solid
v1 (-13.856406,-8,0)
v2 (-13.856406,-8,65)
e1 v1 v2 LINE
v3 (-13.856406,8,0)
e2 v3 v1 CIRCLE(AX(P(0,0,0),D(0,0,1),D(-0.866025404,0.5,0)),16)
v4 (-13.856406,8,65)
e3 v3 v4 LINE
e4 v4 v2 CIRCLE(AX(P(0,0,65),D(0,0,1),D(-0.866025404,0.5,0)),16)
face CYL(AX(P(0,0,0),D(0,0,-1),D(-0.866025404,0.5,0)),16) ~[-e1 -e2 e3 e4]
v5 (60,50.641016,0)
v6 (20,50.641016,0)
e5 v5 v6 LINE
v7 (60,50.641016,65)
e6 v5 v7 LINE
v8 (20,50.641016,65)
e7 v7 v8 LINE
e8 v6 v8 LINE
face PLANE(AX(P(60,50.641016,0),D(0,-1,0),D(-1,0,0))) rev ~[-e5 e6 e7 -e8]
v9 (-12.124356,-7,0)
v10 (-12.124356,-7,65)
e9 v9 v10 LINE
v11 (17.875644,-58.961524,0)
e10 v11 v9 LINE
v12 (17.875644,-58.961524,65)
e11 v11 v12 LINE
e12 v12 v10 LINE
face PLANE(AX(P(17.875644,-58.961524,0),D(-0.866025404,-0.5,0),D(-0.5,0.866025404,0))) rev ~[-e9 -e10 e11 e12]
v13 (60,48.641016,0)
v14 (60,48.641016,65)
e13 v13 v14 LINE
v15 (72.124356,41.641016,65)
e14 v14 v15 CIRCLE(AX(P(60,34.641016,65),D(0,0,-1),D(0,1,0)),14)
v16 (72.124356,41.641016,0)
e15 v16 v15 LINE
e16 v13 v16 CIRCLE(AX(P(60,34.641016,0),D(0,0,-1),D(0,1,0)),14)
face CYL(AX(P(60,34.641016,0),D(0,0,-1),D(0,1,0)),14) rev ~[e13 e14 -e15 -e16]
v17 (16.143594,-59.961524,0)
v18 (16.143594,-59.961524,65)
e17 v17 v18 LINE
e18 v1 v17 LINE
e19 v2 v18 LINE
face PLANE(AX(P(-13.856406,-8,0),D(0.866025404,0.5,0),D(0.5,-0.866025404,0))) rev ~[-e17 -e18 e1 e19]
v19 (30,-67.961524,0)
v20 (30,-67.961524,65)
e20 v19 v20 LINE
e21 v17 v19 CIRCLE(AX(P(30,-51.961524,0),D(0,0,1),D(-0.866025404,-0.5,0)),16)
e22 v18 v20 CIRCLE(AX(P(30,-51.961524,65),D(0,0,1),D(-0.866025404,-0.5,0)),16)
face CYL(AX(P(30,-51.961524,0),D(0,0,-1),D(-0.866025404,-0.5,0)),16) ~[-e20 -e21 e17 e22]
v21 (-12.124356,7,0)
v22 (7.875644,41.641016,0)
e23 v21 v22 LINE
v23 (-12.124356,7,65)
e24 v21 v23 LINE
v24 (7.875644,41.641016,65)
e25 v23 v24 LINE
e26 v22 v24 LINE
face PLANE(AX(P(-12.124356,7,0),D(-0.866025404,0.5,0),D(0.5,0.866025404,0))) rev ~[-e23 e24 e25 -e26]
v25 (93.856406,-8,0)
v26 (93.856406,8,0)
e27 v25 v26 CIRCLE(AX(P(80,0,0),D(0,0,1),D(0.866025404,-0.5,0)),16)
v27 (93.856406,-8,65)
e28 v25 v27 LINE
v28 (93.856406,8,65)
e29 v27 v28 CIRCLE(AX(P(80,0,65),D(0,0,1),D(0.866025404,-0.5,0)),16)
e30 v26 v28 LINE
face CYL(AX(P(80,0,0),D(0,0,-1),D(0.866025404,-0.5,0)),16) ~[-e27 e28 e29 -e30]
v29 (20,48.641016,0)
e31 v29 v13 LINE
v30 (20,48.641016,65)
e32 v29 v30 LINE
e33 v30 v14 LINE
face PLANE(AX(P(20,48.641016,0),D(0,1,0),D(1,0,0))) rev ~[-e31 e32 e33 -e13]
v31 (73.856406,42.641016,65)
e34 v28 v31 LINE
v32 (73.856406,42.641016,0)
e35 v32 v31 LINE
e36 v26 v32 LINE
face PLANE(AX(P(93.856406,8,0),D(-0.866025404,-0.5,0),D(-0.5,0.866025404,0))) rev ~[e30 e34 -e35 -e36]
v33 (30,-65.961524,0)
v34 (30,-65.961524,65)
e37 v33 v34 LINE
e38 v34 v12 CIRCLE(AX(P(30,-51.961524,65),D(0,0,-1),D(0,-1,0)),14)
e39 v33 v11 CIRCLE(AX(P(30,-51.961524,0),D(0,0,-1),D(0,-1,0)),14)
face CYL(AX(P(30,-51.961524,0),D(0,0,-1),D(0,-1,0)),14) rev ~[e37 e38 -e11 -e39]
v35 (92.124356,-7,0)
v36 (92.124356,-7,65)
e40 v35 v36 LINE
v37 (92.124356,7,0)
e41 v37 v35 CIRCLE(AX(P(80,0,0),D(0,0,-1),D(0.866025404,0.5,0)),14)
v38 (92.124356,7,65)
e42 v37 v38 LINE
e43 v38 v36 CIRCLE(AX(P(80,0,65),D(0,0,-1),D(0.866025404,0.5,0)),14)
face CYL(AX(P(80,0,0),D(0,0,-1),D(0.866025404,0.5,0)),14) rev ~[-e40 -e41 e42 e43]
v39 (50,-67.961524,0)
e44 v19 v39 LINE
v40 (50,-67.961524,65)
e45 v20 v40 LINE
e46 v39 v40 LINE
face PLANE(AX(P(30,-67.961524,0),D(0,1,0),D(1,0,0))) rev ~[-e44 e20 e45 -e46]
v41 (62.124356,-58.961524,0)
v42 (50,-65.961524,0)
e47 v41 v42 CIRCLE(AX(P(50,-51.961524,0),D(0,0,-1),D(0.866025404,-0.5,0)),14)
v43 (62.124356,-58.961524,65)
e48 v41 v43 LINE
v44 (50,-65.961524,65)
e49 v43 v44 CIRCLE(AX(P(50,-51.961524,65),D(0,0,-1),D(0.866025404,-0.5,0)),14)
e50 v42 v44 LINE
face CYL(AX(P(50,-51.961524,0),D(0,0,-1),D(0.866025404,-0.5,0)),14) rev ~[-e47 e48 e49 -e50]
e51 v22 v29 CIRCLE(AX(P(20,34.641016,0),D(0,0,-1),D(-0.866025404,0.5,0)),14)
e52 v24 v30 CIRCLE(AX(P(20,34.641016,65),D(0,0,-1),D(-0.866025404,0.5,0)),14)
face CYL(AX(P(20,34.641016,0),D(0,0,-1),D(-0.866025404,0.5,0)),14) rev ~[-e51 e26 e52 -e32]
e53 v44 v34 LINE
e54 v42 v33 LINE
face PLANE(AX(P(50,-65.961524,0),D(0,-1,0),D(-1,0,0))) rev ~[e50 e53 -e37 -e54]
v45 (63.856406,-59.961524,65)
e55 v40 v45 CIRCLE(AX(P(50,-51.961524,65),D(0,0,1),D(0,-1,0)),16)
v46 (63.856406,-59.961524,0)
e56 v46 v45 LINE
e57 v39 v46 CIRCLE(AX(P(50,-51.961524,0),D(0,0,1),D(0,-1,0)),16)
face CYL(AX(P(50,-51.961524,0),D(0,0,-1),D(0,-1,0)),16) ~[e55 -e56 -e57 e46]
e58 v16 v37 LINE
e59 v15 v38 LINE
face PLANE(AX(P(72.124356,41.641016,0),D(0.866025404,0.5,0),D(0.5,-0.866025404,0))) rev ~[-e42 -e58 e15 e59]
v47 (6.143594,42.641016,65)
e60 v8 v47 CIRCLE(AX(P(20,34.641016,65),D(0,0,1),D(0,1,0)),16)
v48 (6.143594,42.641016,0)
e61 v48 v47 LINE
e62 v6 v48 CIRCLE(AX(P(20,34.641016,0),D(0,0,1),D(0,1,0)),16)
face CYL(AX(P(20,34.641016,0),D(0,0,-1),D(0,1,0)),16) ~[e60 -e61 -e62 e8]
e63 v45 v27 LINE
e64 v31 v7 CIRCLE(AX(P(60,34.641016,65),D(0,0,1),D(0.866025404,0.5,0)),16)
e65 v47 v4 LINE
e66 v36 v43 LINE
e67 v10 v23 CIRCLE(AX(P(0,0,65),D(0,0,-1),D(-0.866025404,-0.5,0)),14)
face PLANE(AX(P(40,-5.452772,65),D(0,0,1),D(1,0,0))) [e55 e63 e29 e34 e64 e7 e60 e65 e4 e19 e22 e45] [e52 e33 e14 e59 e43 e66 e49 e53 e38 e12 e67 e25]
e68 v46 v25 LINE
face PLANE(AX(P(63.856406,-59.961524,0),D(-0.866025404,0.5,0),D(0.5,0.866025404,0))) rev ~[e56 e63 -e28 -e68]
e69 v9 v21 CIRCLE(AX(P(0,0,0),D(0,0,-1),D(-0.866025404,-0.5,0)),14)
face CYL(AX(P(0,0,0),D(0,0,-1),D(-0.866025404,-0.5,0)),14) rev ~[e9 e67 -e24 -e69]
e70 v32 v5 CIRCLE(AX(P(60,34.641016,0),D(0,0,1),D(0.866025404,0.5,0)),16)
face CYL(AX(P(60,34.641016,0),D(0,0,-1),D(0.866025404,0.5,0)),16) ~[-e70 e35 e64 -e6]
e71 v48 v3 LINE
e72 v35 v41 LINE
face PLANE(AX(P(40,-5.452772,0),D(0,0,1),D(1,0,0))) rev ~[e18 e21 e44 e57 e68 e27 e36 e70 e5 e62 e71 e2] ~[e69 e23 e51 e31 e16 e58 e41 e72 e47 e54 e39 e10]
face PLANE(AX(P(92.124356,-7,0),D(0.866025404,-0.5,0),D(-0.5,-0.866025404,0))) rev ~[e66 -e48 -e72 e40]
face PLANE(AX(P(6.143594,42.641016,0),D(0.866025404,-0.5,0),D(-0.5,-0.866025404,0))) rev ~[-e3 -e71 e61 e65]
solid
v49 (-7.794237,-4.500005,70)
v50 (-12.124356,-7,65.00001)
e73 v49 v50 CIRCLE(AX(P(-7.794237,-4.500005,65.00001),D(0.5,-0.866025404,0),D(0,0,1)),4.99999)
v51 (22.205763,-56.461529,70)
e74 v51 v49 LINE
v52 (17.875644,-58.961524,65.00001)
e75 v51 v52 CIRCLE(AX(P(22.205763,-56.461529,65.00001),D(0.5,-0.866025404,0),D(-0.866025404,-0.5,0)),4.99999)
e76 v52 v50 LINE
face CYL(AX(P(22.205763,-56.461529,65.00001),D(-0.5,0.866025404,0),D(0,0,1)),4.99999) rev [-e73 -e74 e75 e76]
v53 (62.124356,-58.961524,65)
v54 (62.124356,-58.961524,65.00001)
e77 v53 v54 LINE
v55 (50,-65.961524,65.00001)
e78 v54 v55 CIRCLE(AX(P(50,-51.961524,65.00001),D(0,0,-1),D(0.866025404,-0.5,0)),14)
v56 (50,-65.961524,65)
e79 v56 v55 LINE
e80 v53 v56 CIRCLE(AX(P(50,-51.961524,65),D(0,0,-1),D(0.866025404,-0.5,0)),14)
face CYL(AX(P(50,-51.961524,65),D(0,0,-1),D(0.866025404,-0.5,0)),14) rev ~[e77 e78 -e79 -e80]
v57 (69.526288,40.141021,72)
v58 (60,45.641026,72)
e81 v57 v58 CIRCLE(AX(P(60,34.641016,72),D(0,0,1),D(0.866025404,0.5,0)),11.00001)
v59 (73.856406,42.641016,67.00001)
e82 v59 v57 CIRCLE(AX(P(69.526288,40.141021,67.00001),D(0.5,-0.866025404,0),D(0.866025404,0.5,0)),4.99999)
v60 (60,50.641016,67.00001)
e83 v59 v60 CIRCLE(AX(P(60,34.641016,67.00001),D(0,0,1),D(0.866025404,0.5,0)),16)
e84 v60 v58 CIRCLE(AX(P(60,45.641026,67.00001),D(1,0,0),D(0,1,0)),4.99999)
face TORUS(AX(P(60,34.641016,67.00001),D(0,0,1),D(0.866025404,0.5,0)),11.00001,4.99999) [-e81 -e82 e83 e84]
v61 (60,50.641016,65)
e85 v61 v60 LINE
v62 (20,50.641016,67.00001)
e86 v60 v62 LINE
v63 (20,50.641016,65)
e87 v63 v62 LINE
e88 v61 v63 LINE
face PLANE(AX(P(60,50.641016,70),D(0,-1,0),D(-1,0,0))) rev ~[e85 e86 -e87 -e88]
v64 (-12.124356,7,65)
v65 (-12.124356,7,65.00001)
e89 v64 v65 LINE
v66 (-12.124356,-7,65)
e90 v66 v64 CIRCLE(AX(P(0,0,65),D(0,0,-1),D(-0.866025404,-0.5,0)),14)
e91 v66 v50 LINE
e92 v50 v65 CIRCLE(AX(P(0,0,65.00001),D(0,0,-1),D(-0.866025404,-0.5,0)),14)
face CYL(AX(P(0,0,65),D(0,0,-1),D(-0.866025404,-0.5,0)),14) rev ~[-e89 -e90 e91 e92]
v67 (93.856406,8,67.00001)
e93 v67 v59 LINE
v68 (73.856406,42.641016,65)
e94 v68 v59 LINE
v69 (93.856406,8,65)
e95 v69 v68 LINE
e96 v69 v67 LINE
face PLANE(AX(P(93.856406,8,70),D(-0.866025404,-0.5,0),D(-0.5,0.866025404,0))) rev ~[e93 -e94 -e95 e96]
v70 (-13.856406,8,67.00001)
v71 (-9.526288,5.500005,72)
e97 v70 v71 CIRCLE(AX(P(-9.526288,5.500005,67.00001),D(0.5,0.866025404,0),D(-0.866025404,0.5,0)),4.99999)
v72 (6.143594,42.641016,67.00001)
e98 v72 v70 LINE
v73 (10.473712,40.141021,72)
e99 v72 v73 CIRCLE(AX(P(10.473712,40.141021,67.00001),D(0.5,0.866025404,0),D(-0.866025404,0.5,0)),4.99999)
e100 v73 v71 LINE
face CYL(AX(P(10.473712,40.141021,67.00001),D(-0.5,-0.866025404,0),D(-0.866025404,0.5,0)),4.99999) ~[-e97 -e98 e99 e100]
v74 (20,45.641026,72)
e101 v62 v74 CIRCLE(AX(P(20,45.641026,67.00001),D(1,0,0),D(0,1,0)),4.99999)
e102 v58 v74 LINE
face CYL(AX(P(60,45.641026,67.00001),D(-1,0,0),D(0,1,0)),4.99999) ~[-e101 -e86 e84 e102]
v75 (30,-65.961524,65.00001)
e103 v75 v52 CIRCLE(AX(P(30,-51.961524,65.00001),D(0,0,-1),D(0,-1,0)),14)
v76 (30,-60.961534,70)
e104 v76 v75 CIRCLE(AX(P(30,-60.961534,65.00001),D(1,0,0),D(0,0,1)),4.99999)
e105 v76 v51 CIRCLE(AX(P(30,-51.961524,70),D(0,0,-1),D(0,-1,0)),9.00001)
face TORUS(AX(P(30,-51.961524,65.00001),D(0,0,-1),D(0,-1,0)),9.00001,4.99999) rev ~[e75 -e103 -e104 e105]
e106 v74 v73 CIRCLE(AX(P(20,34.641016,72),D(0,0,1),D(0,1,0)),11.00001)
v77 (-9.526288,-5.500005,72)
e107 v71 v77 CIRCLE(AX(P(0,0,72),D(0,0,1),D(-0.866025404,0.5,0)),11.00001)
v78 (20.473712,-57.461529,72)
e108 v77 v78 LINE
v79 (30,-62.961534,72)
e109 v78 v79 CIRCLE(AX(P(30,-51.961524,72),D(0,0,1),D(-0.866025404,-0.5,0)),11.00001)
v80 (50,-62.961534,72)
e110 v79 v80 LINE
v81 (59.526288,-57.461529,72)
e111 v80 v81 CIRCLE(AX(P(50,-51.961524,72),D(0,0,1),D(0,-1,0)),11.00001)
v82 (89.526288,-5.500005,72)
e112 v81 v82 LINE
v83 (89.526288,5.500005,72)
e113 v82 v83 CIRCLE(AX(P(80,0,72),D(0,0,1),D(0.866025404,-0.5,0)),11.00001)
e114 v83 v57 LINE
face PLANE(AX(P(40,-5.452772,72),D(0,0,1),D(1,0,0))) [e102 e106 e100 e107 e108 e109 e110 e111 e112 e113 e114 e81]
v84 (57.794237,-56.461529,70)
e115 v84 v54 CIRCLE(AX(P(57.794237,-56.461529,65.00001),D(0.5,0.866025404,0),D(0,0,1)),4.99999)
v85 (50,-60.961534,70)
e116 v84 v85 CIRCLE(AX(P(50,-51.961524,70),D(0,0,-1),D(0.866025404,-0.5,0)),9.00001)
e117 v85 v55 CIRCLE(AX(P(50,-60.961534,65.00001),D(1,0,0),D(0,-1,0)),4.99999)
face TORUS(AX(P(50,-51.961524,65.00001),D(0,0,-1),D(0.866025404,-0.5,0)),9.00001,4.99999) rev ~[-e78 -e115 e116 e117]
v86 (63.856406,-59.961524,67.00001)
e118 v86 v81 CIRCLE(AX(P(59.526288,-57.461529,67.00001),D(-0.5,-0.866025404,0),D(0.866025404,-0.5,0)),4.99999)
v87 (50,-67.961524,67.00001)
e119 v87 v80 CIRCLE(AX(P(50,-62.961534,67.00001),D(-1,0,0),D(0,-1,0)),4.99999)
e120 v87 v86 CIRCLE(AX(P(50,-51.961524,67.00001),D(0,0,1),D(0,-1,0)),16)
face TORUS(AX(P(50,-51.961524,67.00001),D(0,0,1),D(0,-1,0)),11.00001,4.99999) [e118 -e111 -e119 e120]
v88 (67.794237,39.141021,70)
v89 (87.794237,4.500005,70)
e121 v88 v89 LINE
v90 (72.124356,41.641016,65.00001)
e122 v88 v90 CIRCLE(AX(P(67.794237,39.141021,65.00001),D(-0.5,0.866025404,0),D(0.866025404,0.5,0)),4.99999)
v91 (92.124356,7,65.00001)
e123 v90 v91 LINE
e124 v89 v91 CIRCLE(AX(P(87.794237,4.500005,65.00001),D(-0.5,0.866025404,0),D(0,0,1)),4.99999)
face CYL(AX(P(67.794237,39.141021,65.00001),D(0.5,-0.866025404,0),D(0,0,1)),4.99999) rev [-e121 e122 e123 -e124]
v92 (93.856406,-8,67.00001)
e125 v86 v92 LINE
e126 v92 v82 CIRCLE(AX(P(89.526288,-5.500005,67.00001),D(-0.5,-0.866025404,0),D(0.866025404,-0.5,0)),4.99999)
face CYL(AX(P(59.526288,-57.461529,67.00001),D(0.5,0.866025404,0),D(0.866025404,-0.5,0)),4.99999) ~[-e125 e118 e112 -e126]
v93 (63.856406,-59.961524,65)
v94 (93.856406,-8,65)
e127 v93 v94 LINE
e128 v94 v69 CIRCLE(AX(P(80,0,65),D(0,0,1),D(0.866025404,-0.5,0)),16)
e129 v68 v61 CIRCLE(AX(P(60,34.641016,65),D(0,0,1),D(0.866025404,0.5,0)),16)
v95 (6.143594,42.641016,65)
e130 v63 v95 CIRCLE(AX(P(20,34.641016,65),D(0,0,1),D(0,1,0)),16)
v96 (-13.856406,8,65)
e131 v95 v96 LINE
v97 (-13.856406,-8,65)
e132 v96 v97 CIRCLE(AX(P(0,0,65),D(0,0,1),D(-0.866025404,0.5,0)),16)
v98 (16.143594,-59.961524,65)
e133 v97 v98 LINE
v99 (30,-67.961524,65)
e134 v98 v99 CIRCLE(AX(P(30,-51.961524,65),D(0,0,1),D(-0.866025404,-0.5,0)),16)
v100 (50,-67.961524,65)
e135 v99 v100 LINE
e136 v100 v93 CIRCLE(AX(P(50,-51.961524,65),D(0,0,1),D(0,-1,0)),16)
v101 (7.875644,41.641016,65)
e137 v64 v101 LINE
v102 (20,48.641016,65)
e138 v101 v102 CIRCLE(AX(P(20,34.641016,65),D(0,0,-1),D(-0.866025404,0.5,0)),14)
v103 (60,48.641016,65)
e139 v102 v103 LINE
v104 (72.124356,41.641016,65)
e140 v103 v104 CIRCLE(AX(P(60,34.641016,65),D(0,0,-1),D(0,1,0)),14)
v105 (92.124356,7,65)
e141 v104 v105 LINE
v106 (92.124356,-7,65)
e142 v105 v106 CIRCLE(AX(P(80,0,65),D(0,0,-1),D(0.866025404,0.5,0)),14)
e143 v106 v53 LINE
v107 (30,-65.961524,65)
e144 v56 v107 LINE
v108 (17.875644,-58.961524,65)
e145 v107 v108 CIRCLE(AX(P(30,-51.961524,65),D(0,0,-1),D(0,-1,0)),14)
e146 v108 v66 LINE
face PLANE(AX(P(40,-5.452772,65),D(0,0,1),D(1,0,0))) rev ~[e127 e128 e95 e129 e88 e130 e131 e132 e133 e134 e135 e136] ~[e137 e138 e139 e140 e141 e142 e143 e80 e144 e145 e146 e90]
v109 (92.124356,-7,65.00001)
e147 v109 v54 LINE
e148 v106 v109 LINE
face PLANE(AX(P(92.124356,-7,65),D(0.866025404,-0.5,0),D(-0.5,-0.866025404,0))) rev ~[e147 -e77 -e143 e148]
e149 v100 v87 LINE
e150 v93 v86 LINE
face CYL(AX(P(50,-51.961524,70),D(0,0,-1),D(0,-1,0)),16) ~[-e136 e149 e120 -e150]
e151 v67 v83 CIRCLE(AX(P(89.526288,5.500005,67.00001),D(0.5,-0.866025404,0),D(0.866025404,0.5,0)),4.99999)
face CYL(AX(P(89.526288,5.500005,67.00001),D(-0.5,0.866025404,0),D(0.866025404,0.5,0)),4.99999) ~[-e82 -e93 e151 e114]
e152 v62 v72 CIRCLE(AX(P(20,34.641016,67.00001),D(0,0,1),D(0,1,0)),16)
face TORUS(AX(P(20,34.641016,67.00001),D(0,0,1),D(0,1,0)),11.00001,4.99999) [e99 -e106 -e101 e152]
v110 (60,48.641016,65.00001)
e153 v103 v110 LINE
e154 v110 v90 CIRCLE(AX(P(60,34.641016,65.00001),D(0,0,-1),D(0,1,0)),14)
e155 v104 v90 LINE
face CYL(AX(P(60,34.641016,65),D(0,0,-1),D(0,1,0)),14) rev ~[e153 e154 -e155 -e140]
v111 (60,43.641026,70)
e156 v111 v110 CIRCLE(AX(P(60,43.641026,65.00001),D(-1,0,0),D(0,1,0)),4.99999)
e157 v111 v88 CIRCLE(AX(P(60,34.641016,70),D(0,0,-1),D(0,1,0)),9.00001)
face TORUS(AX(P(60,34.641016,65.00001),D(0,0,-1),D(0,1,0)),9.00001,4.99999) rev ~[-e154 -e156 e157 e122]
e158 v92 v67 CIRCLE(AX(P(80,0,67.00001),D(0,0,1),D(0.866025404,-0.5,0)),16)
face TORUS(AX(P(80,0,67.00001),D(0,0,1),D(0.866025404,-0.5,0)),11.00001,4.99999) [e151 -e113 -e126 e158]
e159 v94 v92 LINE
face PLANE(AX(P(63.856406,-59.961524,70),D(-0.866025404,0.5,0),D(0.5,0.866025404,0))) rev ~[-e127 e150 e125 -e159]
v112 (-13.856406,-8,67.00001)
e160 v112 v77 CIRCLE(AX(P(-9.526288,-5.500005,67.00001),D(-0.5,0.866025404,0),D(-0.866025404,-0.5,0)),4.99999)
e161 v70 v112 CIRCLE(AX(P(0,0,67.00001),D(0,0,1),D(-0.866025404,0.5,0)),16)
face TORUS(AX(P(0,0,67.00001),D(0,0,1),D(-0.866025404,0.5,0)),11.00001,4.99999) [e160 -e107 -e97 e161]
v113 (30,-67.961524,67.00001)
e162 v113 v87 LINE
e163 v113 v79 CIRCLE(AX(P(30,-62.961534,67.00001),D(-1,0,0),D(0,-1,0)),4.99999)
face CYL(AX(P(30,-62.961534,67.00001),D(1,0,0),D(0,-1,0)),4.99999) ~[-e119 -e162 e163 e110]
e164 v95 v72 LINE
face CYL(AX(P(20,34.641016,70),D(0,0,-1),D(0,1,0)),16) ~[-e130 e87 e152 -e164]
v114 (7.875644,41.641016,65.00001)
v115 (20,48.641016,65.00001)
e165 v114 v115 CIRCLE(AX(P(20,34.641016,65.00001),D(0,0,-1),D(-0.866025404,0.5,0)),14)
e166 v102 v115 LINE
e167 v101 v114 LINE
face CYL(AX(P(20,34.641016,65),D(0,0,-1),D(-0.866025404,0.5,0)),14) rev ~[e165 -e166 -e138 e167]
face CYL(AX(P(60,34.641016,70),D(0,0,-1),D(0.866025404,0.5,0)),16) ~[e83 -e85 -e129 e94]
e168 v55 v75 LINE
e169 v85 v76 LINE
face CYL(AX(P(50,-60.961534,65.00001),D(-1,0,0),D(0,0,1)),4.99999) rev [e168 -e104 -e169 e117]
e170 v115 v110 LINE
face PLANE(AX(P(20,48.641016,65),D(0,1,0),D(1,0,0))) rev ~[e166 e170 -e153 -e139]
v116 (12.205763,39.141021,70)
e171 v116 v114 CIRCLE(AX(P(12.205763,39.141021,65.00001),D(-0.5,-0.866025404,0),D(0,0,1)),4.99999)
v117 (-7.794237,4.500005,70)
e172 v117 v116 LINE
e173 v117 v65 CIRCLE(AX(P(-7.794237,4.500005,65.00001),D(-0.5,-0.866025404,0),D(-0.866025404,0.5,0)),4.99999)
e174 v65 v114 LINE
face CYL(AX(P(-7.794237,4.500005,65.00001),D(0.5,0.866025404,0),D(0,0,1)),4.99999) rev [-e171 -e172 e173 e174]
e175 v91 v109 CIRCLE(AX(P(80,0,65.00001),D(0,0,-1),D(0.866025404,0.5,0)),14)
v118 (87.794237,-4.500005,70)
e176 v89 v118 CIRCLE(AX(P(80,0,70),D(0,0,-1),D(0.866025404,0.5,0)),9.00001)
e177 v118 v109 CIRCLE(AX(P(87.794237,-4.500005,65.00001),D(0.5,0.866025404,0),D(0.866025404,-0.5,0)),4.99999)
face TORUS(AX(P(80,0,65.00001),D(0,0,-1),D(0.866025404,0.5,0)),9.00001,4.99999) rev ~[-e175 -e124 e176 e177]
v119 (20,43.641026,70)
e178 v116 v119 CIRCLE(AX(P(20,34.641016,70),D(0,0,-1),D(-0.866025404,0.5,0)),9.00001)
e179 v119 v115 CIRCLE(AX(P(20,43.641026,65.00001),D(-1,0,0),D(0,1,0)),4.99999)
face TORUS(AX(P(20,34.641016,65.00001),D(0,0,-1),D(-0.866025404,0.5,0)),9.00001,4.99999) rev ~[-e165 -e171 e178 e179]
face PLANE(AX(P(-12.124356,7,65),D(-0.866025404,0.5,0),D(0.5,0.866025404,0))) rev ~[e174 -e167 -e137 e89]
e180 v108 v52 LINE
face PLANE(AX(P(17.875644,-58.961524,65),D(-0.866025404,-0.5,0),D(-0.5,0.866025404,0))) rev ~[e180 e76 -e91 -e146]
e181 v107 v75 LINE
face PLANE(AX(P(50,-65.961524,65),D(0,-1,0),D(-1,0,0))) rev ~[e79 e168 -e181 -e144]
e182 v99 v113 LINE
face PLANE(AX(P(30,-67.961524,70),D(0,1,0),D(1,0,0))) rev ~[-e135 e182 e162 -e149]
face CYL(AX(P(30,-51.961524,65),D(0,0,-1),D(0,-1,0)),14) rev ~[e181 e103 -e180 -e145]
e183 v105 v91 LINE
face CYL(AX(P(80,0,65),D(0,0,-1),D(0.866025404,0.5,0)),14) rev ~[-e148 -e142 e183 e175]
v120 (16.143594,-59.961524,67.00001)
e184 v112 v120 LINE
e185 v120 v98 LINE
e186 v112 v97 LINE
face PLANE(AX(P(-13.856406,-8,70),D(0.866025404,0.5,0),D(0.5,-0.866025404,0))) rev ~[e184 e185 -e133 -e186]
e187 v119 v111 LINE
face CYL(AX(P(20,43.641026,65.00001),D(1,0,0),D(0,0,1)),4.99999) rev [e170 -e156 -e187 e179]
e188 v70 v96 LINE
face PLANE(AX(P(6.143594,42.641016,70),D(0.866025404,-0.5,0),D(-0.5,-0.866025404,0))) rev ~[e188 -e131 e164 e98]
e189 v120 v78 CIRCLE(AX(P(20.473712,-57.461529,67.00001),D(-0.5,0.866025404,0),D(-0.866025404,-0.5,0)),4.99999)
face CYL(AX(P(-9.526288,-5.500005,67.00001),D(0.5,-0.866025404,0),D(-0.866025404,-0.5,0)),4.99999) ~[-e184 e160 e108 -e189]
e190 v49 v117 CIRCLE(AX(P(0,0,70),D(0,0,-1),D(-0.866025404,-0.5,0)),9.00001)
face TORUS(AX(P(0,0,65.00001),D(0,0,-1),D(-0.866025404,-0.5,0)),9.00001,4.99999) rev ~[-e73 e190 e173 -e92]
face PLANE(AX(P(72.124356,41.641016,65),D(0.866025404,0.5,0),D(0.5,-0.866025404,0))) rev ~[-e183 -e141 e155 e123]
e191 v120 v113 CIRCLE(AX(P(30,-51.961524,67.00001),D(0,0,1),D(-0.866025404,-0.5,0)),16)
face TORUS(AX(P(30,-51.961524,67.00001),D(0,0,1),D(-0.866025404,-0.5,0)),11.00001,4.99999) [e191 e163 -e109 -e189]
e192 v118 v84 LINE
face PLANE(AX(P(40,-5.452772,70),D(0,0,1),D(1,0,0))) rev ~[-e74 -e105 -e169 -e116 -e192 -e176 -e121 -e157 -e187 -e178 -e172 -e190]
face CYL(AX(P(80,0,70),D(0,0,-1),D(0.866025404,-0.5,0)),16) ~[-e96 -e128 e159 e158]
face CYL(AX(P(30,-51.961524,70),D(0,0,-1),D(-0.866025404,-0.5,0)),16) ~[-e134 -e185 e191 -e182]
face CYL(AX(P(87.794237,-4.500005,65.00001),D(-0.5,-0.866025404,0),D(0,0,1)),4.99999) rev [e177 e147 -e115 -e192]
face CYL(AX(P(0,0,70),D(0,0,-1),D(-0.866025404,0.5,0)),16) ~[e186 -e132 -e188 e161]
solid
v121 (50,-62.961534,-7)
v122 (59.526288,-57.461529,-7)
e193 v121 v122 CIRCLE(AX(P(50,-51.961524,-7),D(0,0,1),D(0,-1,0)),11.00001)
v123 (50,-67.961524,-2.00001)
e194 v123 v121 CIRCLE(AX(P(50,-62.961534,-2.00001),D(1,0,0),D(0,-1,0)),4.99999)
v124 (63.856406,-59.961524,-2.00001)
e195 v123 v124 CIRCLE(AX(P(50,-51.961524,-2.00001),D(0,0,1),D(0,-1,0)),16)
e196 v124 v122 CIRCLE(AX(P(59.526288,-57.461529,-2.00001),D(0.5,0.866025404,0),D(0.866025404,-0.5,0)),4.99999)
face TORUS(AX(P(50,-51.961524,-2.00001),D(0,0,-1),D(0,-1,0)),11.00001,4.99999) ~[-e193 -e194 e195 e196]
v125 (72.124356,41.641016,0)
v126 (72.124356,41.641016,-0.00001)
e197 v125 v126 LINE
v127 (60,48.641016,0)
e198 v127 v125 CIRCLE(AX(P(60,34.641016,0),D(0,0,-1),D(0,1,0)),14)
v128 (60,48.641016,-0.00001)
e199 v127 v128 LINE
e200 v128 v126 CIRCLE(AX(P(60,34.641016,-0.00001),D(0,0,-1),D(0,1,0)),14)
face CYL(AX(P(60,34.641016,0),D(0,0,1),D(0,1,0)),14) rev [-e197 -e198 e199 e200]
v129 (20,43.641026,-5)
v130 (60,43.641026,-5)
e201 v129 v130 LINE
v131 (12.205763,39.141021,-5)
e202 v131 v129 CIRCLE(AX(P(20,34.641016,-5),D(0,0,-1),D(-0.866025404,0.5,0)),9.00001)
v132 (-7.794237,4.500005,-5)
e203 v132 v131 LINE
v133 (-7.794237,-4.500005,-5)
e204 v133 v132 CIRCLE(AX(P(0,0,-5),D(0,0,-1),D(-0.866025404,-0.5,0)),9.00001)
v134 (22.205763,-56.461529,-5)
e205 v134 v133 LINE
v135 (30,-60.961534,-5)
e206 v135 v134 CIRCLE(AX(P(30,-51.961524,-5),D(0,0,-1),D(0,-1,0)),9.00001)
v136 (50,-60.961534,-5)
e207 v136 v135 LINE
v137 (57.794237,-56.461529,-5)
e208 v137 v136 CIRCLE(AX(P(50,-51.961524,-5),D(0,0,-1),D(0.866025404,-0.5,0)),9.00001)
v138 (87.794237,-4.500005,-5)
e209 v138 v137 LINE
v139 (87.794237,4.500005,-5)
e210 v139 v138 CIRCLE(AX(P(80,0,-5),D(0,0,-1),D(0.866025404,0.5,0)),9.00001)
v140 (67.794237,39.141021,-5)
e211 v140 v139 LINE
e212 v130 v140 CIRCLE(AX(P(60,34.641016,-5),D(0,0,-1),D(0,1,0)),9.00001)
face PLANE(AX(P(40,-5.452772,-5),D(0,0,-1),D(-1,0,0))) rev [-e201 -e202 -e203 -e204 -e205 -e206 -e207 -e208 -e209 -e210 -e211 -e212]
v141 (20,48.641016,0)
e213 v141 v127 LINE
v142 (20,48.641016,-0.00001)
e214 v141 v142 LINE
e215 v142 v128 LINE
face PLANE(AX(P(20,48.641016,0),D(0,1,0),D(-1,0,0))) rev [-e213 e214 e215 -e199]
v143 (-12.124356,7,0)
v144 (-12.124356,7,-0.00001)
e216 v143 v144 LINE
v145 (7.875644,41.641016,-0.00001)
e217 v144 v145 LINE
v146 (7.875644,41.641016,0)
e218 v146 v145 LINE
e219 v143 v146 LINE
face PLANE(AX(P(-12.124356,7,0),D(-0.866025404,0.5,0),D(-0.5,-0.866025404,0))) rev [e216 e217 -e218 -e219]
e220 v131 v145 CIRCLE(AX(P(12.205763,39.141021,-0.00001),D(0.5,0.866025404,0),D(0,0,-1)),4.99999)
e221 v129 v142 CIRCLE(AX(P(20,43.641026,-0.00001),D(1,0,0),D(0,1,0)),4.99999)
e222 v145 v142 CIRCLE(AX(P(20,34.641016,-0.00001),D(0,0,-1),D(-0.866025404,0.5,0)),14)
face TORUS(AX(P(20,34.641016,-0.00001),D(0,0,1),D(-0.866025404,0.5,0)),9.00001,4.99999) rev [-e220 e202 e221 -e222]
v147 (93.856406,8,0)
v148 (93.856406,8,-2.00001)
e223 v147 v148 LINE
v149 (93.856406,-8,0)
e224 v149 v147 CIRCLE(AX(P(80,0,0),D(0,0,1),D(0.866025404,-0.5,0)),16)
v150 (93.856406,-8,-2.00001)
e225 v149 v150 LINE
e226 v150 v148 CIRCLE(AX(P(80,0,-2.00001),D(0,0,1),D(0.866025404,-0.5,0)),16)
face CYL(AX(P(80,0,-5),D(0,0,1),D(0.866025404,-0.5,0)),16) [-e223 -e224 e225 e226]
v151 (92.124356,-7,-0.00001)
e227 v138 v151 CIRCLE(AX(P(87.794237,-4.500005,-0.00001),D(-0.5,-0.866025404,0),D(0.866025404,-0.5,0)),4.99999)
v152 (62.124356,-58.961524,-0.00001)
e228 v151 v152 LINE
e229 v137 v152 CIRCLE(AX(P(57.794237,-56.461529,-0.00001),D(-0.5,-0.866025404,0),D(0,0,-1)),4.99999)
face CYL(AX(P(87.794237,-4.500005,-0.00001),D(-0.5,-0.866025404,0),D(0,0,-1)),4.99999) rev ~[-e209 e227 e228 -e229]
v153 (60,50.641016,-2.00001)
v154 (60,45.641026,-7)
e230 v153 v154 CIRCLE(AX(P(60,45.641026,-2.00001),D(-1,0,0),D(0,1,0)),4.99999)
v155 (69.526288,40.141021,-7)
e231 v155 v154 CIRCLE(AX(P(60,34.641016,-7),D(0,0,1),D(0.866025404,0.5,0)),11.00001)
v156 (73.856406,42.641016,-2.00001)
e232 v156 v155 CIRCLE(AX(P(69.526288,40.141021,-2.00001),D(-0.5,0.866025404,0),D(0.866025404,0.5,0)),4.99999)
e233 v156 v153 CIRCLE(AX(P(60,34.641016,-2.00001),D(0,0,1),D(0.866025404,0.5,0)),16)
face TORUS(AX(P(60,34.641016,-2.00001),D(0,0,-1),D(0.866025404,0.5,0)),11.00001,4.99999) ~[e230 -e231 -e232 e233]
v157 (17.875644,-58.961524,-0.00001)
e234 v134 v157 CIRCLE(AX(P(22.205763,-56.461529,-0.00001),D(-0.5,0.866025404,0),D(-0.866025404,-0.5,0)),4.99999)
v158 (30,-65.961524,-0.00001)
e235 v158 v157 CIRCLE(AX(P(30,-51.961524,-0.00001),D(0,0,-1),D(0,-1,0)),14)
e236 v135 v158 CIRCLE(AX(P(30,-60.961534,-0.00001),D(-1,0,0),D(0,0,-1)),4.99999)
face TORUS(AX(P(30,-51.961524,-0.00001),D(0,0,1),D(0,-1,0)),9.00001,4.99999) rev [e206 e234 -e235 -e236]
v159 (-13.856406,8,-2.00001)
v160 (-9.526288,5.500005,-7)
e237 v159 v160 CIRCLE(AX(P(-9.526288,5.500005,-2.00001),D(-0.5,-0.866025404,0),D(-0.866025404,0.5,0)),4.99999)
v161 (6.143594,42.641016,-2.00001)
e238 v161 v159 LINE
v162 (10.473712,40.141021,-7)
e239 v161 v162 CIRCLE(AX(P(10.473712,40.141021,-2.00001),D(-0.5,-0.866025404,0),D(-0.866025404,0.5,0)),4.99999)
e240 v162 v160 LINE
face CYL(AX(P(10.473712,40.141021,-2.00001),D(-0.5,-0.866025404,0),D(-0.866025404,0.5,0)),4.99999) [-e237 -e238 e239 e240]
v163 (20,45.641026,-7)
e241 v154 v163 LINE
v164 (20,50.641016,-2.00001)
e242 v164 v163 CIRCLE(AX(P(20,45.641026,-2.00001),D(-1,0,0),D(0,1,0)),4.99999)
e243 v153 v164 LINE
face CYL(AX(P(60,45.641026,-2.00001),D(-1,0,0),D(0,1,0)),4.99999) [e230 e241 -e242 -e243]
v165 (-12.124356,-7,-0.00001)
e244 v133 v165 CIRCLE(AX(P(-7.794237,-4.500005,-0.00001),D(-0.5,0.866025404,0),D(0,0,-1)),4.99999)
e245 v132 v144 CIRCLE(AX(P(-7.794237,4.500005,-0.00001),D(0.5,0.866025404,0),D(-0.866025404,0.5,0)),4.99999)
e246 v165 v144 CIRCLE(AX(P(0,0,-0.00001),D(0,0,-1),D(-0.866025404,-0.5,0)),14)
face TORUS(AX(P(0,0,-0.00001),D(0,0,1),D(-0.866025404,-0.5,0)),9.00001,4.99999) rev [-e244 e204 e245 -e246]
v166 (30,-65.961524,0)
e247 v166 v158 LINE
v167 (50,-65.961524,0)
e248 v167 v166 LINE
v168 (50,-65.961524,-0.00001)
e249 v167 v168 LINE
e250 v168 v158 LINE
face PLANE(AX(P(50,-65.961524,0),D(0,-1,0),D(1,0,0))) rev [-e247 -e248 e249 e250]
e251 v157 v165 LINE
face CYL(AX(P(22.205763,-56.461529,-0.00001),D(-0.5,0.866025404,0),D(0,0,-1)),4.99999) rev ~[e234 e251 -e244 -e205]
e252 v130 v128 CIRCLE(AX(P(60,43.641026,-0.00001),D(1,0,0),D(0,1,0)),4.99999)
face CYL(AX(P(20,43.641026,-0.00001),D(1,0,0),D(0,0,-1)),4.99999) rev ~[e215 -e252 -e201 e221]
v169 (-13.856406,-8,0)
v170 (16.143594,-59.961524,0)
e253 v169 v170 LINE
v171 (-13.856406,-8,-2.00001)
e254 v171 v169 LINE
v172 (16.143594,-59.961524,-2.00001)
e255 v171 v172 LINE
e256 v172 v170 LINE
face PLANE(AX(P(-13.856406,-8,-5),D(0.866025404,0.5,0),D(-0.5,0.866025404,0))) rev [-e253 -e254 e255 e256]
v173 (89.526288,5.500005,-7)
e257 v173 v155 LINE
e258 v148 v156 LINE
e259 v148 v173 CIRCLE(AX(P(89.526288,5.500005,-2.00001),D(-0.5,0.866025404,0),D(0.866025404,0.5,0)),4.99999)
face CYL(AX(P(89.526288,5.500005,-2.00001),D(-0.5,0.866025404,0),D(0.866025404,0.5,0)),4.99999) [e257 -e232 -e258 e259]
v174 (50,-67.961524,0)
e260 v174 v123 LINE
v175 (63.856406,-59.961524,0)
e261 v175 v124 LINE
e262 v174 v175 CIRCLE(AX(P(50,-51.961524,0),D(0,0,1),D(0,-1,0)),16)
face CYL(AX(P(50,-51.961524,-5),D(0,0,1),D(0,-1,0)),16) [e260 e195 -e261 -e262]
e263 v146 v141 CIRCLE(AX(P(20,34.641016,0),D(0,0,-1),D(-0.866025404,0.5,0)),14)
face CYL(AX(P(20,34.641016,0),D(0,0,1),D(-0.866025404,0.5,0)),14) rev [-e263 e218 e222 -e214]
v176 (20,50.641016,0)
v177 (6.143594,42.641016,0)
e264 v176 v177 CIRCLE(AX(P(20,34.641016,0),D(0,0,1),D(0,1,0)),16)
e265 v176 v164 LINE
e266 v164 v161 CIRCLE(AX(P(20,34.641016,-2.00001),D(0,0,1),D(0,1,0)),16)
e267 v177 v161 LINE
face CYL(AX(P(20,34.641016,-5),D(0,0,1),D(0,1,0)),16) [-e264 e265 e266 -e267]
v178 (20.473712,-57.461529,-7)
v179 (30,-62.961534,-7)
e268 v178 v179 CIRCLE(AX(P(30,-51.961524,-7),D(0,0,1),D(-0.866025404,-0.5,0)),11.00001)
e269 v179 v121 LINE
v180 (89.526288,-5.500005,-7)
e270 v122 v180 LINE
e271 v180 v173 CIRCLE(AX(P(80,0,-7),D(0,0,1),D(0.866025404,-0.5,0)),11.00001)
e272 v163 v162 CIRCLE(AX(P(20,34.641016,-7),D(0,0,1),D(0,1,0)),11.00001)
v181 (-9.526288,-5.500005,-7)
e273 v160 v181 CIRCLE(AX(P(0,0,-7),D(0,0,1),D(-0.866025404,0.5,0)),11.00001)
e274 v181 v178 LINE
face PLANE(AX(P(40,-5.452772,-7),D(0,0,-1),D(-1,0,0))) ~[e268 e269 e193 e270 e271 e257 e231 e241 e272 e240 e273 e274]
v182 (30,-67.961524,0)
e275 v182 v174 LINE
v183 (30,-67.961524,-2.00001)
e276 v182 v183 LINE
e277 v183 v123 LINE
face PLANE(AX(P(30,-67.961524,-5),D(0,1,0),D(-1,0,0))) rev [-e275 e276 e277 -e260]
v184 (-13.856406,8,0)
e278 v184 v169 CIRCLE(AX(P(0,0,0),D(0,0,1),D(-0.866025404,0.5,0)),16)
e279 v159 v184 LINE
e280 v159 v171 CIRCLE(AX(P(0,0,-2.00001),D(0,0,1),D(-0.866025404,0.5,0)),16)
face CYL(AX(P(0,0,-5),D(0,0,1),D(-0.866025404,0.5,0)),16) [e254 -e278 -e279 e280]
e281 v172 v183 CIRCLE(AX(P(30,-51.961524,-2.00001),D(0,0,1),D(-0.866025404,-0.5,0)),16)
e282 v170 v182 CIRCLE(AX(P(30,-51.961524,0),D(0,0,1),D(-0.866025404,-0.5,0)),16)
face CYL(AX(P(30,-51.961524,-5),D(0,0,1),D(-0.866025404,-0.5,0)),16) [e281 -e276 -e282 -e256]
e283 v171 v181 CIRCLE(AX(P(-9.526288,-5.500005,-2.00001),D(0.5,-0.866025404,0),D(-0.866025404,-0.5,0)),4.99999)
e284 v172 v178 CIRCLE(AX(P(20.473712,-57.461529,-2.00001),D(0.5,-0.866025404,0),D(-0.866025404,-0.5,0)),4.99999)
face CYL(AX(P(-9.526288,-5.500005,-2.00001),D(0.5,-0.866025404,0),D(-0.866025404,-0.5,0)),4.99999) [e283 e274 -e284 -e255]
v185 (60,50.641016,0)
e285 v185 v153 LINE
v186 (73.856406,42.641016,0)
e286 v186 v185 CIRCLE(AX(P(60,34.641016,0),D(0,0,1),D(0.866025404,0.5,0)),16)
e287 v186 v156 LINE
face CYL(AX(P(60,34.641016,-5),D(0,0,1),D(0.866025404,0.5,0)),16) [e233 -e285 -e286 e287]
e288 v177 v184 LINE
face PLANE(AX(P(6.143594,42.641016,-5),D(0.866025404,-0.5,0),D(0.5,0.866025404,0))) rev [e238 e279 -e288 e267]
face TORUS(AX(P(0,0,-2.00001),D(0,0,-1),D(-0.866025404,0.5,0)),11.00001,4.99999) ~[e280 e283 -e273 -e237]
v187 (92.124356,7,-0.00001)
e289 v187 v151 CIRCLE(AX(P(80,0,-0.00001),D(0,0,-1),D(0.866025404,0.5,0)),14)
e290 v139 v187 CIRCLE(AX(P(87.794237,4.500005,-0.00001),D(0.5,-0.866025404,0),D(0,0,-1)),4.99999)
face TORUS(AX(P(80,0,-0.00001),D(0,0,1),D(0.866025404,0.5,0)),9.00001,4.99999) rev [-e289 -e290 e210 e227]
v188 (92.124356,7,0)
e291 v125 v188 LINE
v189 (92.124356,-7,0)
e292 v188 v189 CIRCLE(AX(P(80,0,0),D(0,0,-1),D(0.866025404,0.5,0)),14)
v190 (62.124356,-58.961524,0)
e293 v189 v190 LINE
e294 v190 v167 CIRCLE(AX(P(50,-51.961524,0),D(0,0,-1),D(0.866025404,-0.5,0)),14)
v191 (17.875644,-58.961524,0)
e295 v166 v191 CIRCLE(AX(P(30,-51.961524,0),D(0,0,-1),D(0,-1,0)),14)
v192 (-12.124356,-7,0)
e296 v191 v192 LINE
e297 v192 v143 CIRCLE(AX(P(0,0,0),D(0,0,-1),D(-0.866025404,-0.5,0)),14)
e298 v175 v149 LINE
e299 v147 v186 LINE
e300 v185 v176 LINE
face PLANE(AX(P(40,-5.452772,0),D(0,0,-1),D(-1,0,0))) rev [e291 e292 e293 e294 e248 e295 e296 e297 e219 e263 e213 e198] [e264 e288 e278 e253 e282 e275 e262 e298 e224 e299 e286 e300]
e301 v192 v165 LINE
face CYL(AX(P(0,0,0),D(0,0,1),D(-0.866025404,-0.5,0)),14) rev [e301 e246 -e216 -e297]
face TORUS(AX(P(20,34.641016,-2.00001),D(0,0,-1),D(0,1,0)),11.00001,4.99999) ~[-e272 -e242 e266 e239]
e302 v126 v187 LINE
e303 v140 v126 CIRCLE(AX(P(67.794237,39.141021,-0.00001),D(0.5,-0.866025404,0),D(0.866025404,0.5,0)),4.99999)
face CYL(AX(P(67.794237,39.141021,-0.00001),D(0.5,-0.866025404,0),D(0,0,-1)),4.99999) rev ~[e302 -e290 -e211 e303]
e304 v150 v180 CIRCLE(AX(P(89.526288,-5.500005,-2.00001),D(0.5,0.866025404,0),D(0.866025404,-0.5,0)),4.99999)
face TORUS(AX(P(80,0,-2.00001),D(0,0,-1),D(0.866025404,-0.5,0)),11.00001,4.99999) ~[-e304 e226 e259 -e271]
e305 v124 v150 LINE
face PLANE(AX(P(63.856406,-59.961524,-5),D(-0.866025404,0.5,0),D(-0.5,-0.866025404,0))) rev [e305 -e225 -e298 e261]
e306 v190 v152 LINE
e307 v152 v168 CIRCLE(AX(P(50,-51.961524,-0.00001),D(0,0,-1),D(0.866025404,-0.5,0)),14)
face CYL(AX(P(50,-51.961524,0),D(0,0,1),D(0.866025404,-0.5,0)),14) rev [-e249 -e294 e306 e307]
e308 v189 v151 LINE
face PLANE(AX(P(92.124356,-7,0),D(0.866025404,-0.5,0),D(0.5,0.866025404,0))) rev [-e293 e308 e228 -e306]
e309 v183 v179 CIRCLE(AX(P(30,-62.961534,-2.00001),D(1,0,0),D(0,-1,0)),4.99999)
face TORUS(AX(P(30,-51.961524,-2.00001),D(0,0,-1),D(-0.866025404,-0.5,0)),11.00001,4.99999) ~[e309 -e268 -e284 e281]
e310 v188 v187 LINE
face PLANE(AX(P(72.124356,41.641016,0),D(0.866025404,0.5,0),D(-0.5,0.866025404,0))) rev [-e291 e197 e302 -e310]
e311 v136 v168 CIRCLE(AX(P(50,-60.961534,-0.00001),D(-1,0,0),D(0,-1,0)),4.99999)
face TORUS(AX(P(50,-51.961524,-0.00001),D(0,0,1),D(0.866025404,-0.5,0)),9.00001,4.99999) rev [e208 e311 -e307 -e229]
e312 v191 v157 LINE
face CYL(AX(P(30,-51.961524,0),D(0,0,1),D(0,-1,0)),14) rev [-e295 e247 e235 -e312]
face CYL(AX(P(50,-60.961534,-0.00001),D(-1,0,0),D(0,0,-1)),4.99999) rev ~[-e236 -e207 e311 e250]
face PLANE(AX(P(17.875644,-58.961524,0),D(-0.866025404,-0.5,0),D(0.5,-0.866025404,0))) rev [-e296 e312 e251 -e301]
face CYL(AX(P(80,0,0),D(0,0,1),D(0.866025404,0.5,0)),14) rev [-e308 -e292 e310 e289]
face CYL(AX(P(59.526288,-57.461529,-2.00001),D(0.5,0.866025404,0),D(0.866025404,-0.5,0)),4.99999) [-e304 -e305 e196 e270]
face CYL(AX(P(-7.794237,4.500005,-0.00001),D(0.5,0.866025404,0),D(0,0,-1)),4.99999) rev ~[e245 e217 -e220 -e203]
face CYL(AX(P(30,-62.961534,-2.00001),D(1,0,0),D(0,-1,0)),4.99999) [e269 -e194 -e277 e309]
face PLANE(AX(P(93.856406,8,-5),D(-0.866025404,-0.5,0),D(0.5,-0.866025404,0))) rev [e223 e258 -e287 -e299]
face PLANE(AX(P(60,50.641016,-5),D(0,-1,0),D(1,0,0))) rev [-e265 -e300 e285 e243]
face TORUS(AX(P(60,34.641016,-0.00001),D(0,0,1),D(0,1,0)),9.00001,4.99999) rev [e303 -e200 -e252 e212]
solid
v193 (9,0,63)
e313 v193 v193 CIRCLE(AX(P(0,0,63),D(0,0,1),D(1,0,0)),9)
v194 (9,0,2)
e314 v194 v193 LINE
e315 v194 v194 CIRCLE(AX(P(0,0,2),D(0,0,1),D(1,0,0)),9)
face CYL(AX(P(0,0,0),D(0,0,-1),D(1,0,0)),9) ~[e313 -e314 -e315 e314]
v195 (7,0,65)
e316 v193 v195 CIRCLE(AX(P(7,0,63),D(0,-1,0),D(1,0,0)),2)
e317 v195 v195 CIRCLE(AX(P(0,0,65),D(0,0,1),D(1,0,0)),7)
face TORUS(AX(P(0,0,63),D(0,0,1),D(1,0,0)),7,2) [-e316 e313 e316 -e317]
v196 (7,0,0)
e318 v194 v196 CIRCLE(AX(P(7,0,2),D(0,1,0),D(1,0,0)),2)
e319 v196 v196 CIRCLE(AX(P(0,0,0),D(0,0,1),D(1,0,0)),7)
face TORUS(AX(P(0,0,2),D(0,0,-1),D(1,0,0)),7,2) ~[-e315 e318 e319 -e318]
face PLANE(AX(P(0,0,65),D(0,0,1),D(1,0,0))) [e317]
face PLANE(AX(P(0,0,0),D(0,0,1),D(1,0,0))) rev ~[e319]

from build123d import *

# Parameters (mm, degrees)
F0_R     = 9
F1_DEPTH = 65
F2_R     = 2
F4_DEPTH = 65
F6_DEPTH = 5
F8_DEPTH = 2
F9_R     = 4.99999


# Not quite as in the source:
# - a fillet or chamfer is up to 0.001 mm smaller than in the source, because OpenCascade refuses the exact size


with BuildPart() as f1:
    # F0 (on Top) → F1 (new body)
    with BuildSketch(Plane.XY):
        Circle(F0_R)
    extrude(amount=F1_DEPTH)

    # F2
    f2_edges = [f1.edges().sort_by_distance(p)[0] for p in [
        (-9, 0, 65),
        (-9, 0, 0),
    ]]
    fillet(f2_edges, radius=F2_R)


with BuildPart() as f4:
    # F3 (on Top) → F4 (new body)
    with BuildSketch(Plane.XY):
        with BuildLine():
            Line((60, 50.6410161514), (20, 50.6410161514))
            ThreePointArc((20, 50.6410161514), (12, 48.4974226119), (6.1435935394, 42.6410161514))
            Line((6.1435935394, 42.6410161514), (-13.8564064606, 8))
            ThreePointArc((-13.8564064606, 8), (-16, 0), (-13.8564064606, -8))
            Line((-13.8564064606, -8), (16.1435935394, -59.9615242271))
            ThreePointArc((16.1435935394, -59.9615242271), (22, -65.8179306876), (30, -67.9615242271))
            Line((30, -67.9615242271), (50, -67.9615242271))
            ThreePointArc((50, -67.9615242271), (58, -65.8179306876), (63.8564064606, -59.9615242271))
            Line((63.8564064606, -59.9615242271), (93.8564064606, -8))
            ThreePointArc((93.8564064606, -8), (96, 0), (93.8564064606, 8))
            Line((93.8564064606, 8), (73.8564064606, 42.6410161514))
            ThreePointArc((73.8564064606, 42.6410161514), (68, 48.4974226119), (60, 50.6410161514))
        make_face()
        with BuildLine():
            ThreePointArc((7.875644347, 41.6410161514), (13, 46.7653718044), (20, 48.6410161514))
            Line((20, 48.6410161514), (60, 48.6410161514))
            ThreePointArc((60, 48.6410161514), (67, 46.7653718044), (72.124355653, 41.6410161514))
            Line((72.124355653, 41.6410161514), (92.124355653, 7))
            ThreePointArc((92.124355653, 7), (94, 0), (92.124355653, -7))
            Line((92.124355653, -7), (62.124355653, -58.9615242271))
            ThreePointArc((62.124355653, -58.9615242271), (57, -64.08587988), (50, -65.9615242271))
            Line((50, -65.9615242271), (30, -65.9615242271))
            ThreePointArc((30, -65.9615242271), (23, -64.08587988), (17.875644347, -58.9615242271))
            Line((17.875644347, -58.9615242271), (-12.124355653, -7))
            ThreePointArc((-12.124355653, -7), (-14, 0), (-12.124355653, 7))
            Line((-12.124355653, 7), (7.875644347, 41.6410161514))
        make_face(mode=Mode.SUBTRACT)
    extrude(amount=F4_DEPTH)


with BuildPart() as f6:
    # F5 (on face) → F6 (new body)
    with BuildSketch(Plane.XY.offset(65)):
        with BuildLine():
            Line((30, -67.9615242271), (50, -67.9615242271))
            ThreePointArc((50, -67.9615242271), (58, -65.8179306876), (63.8564064606, -59.9615242271))
            Line((63.8564064606, -59.9615242271), (93.8564064606, -8))
            ThreePointArc((93.8564064606, -8), (96, 0), (93.8564064606, 8))
            Line((93.8564064606, 8), (73.8564064606, 42.6410161514))
            ThreePointArc((73.8564064606, 42.6410161514), (68, 48.4974226119), (60, 50.6410161514))
            Line((60, 50.6410161514), (20, 50.6410161514))
            ThreePointArc((20, 50.6410161514), (12, 48.4974226119), (6.1435935394, 42.6410161514))
            Line((6.1435935394, 42.6410161514), (-13.8564064606, 8))
            ThreePointArc((-13.8564064606, 8), (-16, 0), (-13.8564064606, -8))
            Line((-13.8564064606, -8), (16.1435935394, -59.9615242271))
            ThreePointArc((16.1435935394, -59.9615242271), (22, -65.8179306876), (30, -67.9615242271))
        make_face()
        with BuildLine():
            Line((-12.124355653, 7), (7.875644347, 41.6410161514))
            ThreePointArc((7.875644347, 41.6410161514), (13, 46.7653718044), (20, 48.6410161514))
            Line((20, 48.6410161514), (60, 48.6410161514))
            ThreePointArc((60, 48.6410161514), (67, 46.7653718044), (72.124355653, 41.6410161514))
            Line((72.124355653, 41.6410161514), (92.124355653, 7))
            ThreePointArc((92.124355653, 7), (94, 0), (92.124355653, -7))
            Line((92.124355653, -7), (62.124355653, -58.9615242271))
            ThreePointArc((62.124355653, -58.9615242271), (57, -64.08587988), (50, -65.9615242271))
            Line((50, -65.9615242271), (30, -65.9615242271))
            ThreePointArc((30, -65.9615242271), (23, -64.08587988), (17.875644347, -58.9615242271))
            Line((17.875644347, -58.9615242271), (-12.124355653, -7))
            ThreePointArc((-12.124355653, -7), (-14, 0), (-12.124355653, 7))
        make_face(mode=Mode.SUBTRACT)
    extrude(amount=F6_DEPTH)

    # F7 (on face) → F8 (join)
    with BuildSketch(Plane.XY.offset(70)):
        with BuildLine():
            ThreePointArc((16.1435935394, -59.9615242271), (22, -65.8179306876), (30, -67.9615242271))
            Line((30, -67.9615242271), (50, -67.9615242271))
            ThreePointArc((50, -67.9615242271), (58, -65.8179306876), (63.8564064606, -59.9615242271))
            Line((63.8564064606, -59.9615242271), (93.8564064606, -8))
            ThreePointArc((93.8564064606, -8), (96, 0), (93.8564064606, 8))
            Line((93.8564064606, 8), (73.8564064606, 42.6410161514))
            ThreePointArc((73.8564064606, 42.6410161514), (68, 48.4974226119), (60, 50.6410161514))
            Line((60, 50.6410161514), (20, 50.6410161514))
            ThreePointArc((20, 50.6410161514), (12, 48.4974226119), (6.1435935394, 42.6410161514))
            Line((6.1435935394, 42.6410161514), (-13.8564064606, 8))
            ThreePointArc((-13.8564064606, 8), (-16, 0), (-13.8564064606, -8))
            Line((-13.8564064606, -8), (16.1435935394, -59.9615242271))
        make_face()
        with BuildLine():
            ThreePointArc((30, -65.9615242271), (23, -64.08587988), (17.875644347, -58.9615242271))
            Line((17.875644347, -58.9615242271), (-12.124355653, -7))
            ThreePointArc((-12.124355653, -7), (-14, 0), (-12.124355653, 7))
            Line((-12.124355653, 7), (7.875644347, 41.6410161514))
            ThreePointArc((7.875644347, 41.6410161514), (13, 46.7653718044), (20, 48.6410161514))
            Line((20, 48.6410161514), (60, 48.6410161514))
            ThreePointArc((60, 48.6410161514), (67, 46.7653718044), (72.124355653, 41.6410161514))
            Line((72.124355653, 41.6410161514), (92.124355653, 7))
            ThreePointArc((92.124355653, 7), (94, 0), (92.124355653, -7))
            Line((92.124355653, -7), (62.124355653, -58.9615242271))
            ThreePointArc((62.124355653, -58.9615242271), (57, -64.08587988), (50, -65.9615242271))
            Line((50, -65.9615242271), (30, -65.9615242271))
        make_face(mode=Mode.SUBTRACT)
        with BuildLine():
            Line((-12.124355653, -7), (17.875644347, -58.9615242271))
            ThreePointArc((17.875644347, -58.9615242271), (23, -64.08587988), (30, -65.9615242271))
            Line((30, -65.9615242271), (50, -65.9615242271))
            ThreePointArc((50, -65.9615242271), (57, -64.08587988), (62.124355653, -58.9615242271))
            Line((62.124355653, -58.9615242271), (92.124355653, -7))
            ThreePointArc((92.124355653, -7), (94, 0), (92.124355653, 7))
            Line((92.124355653, 7), (72.124355653, 41.6410161514))
            ThreePointArc((72.124355653, 41.6410161514), (67, 46.7653718044), (60, 48.6410161514))
            Line((60, 48.6410161514), (20, 48.6410161514))
            ThreePointArc((20, 48.6410161514), (13, 46.7653718044), (7.875644347, 41.6410161514))
            Line((7.875644347, 41.6410161514), (-12.124355653, 7))
            ThreePointArc((-12.124355653, 7), (-14, 0), (-12.124355653, -7))
        make_face()
    extrude(amount=F8_DEPTH)

    # F9 (radius 5 in the source; OpenCascade refuses exactly that, so slightly less here)
    f9_edges = [f6.edges().sort_by_distance(p)[0] for p in [
        (-3.856406, 25.320508, 72),
        (67, 46.765372, 70),
    ]]
    fillet(f9_edges, radius=F9_R)


with BuildPart() as f11_1:
    # F11: instance of F6
    add(f6.part.mirror(Plane.XY.offset(32.5)))


solid = Compound([f1.part, f4.part, f6.part, f11_1.part])
